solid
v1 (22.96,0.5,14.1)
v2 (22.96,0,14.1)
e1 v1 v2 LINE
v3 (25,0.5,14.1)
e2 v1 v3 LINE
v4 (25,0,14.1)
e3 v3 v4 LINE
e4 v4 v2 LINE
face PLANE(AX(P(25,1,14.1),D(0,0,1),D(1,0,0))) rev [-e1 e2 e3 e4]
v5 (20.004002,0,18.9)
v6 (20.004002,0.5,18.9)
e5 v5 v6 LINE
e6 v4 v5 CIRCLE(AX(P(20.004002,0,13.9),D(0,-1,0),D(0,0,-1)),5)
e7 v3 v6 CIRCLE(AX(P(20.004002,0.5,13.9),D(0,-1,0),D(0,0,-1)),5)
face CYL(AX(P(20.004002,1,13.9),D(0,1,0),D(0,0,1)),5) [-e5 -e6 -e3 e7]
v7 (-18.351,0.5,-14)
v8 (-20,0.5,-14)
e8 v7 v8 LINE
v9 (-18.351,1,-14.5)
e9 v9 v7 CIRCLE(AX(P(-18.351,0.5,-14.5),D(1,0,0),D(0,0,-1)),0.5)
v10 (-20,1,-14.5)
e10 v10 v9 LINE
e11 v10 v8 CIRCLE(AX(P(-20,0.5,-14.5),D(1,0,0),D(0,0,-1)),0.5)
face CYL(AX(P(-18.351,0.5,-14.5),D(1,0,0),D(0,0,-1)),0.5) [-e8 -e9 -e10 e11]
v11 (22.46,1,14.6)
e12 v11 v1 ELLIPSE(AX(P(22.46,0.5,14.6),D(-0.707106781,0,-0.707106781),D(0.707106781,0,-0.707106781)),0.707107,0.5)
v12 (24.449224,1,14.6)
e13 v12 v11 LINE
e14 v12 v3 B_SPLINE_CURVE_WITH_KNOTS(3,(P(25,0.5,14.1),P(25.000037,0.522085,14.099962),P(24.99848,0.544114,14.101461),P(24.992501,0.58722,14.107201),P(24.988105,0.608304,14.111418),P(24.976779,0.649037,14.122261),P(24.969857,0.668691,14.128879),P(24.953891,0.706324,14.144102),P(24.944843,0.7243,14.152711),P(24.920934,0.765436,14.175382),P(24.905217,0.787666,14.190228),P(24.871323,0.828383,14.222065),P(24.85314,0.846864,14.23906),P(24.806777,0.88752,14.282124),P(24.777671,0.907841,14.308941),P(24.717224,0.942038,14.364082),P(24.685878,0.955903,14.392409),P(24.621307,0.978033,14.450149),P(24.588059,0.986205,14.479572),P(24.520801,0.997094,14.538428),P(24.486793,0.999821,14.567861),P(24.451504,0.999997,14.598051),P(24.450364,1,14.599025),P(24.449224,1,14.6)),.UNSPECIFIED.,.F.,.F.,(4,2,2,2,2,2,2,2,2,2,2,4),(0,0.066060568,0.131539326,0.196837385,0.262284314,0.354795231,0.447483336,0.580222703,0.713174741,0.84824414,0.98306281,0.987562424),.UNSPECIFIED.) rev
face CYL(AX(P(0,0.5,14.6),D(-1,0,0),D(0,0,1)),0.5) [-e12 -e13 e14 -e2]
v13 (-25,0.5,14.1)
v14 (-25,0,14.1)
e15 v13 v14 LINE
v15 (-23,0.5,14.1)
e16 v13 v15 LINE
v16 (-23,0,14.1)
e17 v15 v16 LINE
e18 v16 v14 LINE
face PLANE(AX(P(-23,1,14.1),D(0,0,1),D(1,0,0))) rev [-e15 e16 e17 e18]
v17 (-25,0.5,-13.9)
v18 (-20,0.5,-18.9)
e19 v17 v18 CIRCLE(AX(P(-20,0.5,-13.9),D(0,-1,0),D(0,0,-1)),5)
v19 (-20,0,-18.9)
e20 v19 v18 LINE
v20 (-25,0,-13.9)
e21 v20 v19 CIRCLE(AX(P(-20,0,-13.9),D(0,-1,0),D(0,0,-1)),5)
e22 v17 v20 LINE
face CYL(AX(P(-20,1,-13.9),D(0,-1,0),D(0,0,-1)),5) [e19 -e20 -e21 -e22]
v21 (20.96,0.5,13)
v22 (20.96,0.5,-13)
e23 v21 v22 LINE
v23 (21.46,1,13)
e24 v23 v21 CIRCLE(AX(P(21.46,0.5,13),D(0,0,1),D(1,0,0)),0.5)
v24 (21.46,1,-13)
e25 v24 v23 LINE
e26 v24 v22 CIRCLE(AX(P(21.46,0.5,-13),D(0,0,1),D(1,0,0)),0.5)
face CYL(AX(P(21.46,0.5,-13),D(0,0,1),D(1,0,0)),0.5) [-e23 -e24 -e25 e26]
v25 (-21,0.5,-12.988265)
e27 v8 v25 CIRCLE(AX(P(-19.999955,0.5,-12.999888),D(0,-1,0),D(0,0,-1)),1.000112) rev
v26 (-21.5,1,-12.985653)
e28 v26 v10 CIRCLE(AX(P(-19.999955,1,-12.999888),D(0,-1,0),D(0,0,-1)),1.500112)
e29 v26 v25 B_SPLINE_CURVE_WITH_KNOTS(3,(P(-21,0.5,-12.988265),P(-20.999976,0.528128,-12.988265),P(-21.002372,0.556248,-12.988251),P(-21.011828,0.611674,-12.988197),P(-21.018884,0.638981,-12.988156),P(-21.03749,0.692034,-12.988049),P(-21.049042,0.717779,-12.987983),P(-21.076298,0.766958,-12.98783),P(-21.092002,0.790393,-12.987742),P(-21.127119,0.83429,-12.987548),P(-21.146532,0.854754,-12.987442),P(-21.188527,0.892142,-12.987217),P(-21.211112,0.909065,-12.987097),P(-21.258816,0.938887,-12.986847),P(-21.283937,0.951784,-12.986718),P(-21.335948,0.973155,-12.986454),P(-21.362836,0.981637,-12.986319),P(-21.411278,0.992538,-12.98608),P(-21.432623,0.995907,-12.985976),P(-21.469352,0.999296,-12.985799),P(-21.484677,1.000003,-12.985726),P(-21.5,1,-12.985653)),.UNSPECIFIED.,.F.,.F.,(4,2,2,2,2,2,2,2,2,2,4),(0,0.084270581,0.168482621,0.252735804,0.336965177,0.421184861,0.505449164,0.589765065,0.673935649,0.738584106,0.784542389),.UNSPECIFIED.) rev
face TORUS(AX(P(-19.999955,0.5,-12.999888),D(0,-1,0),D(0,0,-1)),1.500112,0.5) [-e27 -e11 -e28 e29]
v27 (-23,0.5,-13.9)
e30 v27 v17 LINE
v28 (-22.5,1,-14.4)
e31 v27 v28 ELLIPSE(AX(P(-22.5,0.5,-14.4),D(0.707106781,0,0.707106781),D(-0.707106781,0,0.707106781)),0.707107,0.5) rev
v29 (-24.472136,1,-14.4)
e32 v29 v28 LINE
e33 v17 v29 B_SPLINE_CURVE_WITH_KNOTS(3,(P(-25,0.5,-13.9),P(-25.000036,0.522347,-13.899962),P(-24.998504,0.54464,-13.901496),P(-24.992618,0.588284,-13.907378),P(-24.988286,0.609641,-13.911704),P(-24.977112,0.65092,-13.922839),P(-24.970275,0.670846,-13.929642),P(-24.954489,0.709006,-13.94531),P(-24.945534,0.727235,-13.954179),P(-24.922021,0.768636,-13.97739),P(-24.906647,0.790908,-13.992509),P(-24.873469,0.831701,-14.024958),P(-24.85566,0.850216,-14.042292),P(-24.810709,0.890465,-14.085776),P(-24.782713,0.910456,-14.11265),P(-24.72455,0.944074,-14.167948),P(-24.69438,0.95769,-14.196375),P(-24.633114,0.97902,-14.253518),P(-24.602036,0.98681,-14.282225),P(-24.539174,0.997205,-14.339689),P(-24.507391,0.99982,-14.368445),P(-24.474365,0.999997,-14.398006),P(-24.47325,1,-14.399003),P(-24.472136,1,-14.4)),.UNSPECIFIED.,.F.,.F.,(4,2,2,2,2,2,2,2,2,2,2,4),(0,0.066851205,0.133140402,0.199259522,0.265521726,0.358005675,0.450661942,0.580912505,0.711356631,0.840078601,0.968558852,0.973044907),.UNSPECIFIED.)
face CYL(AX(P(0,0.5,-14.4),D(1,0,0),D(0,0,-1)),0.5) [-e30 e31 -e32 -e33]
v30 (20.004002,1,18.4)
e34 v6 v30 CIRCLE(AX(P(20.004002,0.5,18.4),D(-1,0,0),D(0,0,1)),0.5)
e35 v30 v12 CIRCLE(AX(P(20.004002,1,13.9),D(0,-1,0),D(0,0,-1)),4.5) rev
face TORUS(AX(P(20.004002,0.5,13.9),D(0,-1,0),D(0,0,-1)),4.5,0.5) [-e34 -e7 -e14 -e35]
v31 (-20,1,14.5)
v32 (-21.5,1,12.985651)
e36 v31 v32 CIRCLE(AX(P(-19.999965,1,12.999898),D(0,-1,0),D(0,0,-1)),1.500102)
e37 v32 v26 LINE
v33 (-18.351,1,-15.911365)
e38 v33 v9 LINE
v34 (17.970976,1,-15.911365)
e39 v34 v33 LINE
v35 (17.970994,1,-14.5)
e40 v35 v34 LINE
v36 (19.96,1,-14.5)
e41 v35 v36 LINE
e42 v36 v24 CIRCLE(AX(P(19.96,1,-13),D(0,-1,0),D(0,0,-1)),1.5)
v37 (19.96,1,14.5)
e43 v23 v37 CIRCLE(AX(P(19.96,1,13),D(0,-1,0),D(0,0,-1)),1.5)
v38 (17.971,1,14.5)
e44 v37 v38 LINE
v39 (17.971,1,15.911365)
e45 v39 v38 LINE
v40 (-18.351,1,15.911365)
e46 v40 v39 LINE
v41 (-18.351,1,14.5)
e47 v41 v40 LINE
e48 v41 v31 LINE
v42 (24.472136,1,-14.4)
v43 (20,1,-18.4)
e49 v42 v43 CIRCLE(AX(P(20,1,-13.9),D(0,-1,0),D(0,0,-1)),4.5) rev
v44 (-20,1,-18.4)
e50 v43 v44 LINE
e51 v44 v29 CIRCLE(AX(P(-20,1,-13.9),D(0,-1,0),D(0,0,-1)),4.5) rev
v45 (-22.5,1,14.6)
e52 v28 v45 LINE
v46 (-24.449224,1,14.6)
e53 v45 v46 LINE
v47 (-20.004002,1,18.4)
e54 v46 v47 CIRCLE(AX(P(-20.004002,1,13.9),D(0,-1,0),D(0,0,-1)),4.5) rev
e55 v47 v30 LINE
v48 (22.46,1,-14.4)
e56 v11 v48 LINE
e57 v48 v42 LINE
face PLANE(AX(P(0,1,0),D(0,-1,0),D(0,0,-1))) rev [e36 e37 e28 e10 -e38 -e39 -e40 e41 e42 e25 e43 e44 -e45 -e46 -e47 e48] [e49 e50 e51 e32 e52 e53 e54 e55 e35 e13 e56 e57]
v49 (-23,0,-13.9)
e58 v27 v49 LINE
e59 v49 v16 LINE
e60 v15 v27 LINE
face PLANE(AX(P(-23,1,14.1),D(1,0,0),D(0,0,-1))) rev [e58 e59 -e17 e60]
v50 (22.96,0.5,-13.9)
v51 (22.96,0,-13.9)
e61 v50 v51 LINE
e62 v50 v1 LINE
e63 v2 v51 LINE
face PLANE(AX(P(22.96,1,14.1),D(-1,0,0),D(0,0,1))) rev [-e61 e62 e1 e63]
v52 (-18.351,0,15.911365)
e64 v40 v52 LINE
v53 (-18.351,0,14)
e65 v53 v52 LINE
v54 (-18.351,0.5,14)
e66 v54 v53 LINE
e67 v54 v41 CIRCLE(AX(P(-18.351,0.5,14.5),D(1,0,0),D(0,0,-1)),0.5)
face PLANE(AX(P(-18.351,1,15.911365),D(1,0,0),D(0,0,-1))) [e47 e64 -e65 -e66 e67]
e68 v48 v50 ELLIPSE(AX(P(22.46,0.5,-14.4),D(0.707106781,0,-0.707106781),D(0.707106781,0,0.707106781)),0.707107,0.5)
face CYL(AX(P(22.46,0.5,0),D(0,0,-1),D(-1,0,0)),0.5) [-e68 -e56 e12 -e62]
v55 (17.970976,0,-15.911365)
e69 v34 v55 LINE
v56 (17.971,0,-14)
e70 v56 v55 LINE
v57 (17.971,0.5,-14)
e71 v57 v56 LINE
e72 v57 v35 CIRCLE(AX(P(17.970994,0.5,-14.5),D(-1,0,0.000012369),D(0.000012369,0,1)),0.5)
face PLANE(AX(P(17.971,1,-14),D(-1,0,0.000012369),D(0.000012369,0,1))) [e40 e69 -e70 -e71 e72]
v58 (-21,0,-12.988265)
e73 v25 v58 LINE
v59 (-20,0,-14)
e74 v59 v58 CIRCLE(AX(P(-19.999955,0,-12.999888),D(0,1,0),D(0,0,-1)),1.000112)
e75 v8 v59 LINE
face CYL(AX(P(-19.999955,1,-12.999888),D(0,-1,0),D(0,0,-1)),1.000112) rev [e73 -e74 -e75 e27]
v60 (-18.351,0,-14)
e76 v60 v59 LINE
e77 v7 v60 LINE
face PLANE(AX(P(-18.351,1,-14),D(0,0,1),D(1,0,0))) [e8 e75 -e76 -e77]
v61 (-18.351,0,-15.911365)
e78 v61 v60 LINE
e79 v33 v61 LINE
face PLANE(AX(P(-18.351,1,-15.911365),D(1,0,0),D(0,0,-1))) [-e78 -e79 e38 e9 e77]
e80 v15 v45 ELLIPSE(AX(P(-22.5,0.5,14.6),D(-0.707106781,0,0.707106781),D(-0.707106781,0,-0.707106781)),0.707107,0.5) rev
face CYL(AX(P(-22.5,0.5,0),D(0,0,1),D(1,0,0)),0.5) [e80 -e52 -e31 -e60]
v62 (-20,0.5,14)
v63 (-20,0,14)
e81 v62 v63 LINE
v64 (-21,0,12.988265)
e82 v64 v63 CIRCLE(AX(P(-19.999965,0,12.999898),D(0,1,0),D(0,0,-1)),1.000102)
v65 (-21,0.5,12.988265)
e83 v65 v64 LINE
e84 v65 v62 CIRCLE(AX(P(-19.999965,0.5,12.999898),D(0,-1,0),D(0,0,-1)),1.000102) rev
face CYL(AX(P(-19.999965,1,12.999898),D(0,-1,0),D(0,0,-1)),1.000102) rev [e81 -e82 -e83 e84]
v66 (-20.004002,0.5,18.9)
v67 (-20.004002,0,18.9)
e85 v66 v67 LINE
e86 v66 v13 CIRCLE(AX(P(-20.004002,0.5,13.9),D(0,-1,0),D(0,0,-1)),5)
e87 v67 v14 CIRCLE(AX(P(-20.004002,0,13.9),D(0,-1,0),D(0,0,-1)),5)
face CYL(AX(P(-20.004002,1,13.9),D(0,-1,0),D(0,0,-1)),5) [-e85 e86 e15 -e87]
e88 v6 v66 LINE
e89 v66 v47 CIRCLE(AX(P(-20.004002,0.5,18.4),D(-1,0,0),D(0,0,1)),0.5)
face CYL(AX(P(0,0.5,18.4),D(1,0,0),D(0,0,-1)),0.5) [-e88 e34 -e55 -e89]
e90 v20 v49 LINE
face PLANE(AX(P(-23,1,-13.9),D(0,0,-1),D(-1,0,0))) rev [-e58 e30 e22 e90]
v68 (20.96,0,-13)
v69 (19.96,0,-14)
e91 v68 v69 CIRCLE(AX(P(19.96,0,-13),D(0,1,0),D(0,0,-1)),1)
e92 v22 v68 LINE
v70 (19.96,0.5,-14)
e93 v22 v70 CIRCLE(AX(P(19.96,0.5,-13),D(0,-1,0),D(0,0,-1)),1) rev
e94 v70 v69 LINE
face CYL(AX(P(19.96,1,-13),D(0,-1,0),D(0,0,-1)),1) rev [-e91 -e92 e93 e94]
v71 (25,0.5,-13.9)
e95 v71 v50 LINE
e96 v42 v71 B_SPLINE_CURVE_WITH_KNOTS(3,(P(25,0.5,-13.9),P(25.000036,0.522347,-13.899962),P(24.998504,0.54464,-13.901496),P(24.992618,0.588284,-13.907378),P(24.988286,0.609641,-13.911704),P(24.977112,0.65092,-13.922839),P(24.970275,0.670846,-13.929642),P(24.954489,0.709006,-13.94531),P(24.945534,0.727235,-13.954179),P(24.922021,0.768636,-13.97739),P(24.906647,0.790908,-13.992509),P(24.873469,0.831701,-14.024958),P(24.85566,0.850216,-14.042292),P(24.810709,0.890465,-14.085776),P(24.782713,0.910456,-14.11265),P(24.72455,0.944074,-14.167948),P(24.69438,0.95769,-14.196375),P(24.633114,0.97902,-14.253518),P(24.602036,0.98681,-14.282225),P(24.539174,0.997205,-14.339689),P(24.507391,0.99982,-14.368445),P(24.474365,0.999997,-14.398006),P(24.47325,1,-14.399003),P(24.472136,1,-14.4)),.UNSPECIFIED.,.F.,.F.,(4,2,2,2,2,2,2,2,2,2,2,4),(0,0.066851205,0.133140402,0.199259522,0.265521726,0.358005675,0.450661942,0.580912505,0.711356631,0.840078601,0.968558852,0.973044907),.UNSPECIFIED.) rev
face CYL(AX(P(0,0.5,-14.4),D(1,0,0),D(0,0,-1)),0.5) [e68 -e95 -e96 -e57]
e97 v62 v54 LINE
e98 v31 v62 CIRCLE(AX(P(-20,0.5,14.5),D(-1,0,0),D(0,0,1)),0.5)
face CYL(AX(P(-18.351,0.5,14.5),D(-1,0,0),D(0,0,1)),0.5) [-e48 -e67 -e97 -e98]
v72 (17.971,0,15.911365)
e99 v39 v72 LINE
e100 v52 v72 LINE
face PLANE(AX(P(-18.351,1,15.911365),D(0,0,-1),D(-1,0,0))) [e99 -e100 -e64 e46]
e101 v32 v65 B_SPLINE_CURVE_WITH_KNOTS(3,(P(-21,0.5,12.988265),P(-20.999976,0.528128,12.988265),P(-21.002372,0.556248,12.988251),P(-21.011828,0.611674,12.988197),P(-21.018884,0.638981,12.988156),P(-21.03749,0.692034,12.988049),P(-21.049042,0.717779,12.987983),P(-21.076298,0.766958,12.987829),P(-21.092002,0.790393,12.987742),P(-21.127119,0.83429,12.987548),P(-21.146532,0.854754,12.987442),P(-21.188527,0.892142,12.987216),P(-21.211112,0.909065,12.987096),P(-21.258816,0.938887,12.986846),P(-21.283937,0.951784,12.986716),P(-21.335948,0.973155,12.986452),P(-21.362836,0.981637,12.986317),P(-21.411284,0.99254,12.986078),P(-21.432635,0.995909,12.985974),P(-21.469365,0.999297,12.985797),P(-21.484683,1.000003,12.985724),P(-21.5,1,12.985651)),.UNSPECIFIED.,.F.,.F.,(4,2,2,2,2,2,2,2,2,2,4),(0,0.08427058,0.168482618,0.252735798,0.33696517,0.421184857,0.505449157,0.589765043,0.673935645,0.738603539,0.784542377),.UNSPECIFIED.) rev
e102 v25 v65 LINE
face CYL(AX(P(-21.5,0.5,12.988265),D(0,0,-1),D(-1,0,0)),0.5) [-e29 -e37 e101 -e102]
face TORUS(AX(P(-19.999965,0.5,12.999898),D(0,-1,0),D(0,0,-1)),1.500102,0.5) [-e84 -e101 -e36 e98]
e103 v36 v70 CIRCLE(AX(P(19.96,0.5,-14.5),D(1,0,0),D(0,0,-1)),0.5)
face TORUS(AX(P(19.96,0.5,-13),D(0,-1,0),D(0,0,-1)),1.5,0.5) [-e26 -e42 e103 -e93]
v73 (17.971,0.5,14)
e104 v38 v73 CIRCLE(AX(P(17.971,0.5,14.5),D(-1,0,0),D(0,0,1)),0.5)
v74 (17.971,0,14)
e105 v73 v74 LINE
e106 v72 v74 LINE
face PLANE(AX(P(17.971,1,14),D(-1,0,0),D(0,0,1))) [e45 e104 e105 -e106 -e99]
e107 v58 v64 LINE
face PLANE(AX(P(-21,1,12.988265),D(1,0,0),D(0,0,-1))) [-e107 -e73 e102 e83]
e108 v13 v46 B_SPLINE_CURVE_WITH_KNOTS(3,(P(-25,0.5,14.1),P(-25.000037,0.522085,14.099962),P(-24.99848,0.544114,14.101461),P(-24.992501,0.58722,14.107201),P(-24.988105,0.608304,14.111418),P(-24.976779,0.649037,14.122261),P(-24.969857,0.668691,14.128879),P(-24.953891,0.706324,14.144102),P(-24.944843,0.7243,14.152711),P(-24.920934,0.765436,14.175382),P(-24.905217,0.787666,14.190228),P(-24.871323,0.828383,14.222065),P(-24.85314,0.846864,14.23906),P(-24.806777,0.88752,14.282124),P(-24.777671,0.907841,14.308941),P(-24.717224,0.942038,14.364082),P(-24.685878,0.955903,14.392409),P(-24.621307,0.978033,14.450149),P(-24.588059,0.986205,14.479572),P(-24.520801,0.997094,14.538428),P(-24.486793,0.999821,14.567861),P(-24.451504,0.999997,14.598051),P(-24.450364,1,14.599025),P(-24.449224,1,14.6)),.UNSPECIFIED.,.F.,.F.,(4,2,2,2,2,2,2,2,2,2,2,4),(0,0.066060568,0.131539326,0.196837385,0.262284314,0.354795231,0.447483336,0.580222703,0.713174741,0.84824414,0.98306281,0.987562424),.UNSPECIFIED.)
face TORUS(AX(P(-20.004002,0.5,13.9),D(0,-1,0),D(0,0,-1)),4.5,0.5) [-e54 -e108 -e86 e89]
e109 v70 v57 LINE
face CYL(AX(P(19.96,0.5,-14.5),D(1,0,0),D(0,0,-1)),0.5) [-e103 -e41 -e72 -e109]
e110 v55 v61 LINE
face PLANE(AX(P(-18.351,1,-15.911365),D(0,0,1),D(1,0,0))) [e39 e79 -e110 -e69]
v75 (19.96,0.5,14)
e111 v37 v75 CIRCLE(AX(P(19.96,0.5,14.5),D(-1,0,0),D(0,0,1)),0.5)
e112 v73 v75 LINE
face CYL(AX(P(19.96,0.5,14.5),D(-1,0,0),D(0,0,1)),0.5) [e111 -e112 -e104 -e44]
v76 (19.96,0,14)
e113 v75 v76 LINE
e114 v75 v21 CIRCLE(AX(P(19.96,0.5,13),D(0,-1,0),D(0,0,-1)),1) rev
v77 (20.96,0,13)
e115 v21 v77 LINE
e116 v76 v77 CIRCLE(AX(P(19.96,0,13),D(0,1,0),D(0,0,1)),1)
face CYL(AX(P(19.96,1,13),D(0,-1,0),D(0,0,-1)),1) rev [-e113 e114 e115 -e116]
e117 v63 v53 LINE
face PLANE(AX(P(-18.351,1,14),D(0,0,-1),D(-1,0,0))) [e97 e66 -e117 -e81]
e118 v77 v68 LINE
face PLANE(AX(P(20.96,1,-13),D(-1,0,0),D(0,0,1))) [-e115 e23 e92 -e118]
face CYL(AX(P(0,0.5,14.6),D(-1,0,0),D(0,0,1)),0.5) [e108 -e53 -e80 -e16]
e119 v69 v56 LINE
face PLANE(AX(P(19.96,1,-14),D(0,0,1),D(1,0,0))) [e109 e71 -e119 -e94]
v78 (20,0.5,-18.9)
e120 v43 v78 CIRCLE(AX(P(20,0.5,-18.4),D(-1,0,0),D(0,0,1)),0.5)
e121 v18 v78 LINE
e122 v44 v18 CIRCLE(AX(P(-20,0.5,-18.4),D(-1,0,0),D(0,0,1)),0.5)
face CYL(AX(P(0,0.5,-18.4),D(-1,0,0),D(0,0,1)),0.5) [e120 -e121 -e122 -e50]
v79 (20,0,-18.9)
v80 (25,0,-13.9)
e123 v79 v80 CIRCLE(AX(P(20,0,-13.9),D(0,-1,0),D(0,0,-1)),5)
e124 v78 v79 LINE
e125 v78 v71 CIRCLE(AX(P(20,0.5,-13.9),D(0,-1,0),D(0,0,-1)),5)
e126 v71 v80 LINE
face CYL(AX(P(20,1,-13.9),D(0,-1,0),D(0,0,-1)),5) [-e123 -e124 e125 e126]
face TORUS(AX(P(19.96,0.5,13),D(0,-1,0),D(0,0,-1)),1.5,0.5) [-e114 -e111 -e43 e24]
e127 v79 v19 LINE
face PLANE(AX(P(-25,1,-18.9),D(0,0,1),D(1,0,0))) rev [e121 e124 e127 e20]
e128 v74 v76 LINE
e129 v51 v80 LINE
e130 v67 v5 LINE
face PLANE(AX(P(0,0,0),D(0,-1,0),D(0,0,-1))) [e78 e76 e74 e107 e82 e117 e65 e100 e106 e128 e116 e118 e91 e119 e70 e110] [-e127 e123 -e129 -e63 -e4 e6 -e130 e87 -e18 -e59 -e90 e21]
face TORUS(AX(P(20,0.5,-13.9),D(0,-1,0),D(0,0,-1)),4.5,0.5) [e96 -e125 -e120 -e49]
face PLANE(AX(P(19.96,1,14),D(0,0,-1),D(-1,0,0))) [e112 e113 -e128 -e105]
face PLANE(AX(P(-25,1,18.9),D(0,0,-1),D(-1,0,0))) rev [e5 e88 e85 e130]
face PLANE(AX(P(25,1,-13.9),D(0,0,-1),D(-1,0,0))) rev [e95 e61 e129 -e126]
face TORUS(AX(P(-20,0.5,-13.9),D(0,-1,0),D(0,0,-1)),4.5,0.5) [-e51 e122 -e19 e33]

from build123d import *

# Parameters (mm, degrees)
BOSS_EXTRUDE1_DEPTH = 1
FILLET1_R           = 5
FILLET2_R           = 0.5


with BuildPart() as part:
    # Sketch1 → Boss-Extrude1 (new body)
    with BuildSketch(Plane(origin=(0, 0, 0), x_dir=(1, 0, 0), z_dir=(0, 1, 0))):
        Polygon((-25, -18.9), (25, -18.9), (25, -14.1), (22.96, -14.1), (22.96, 13.9), (25, 13.9), (25, 18.9), (-25, 18.9), (-25, 13.9), (-23, 13.9), (-23, -14.1), (-25, -14.1), align=None)
        with BuildLine():
            Line((-18.351, 15.911365238), (17.970976359, 15.911365238))
            Line((17.970976359, 15.911365238), (17.971, 14))
            Line((17.971, 14), (19.96, 14))
            ThreePointArc((19.96, 14), (20.667106781, 13.707106781), (20.96, 13))
            Line((20.96, 13), (20.96, -13))
            ThreePointArc((20.96, -13), (20.667106781, -13.707106781), (19.96, -14))
            Line((19.96, -14), (17.971, -14))
            Line((17.971, -14), (17.971, -15.911365238))
            Line((17.971, -15.911365238), (-18.351, -15.911365238))
            Line((-18.351, -15.911365238), (-18.351, -14))
            Line((-18.351, -14), (-20, -14))
            ThreePointArc((-20, -14), (-20.711257423, -13.702939741), (-21, -12.988265238))
            Line((-21, -12.988265238), (-21, 12.988265238))
            ThreePointArc((-21, 12.988265238), (-20.711254501, 13.702936852), (-20, 14))
            Line((-20, 14), (-18.351, 14))
            Line((-18.351, 14), (-18.351, 15.911365238))
        make_face(mode=Mode.SUBTRACT)
    extrude(amount=BOSS_EXTRUDE1_DEPTH)

    # Fillet1
    # the kernel refuses this fillet: 5 mm, written as the material it takes off along each edge
    with BuildSketch(Plane(origin=(25, -12.489995997, 18.9), x_dir=(-1, 0, 0), z_dir=(0, 1, 0))) as fillet1_piece_1:
        with BuildLine():
            CenterArc((4.995998399, -5), FILLET1_R, 90, 87.707557224)
            Line((0, -4.8), (-0.099919968, -4.796))
            ThreePointArc((-0.099919968, -4.796), (-0.1, -2.4), (-0.1, 0))
            Line((-0.1, 0), (0, 0.1))
            Line((0, 0.1), (4.995998399, 0.1))
            Line((4.995998399, 0.1), (4.995998399, 0))
        make_face()
    extrude(amount=25.979991994, mode=Mode.SUBTRACT)
    with BuildSketch(Plane(origin=(-25, -12.489995997, 18.9), x_dir=(1, 0, 0), z_dir=(0, 1, 0))) as fillet1_piece_2:
        with BuildLine():
            CenterArc((4.995998399, 5), FILLET1_R, 182.292442776, 87.707557224)
            Line((0, 4.8), (-0.099919968, 4.796))
            ThreePointArc((-0.099919968, 4.796), (-0.1, 2.4), (-0.1, 0))
            Line((-0.1, 0), (0, -0.1))
            Line((0, -0.1), (4.995998399, -0.1))
            Line((4.995998399, -0.1), (4.995998399, 0))
        make_face()
    extrude(amount=25.979991994, mode=Mode.SUBTRACT)
    with BuildSketch(Plane(origin=(-25, -12.5, -18.9), x_dir=(1, 0, 0), z_dir=(0, 1, 0)), Plane(origin=(25, -12.5, -18.9), x_dir=(0, 0, 1), z_dir=(0, 1, 0))) as fillet1_piece_3:
        with BuildLine():
            CenterArc((FILLET1_R, -FILLET1_R), FILLET1_R, 90, 90)
            Line((0, -FILLET1_R), (-FILLET1_R * 0.02, -FILLET1_R))
            Line((-FILLET1_R * 0.02, -FILLET1_R), (-FILLET1_R * 0.02, FILLET1_R * 0.02))
            Line((-FILLET1_R * 0.02, FILLET1_R * 0.02), (FILLET1_R, FILLET1_R * 0.02))
            Line((FILLET1_R, FILLET1_R * 0.02), (FILLET1_R, 0))
        make_face()
    extrude(amount=26, mode=Mode.SUBTRACT)

    # Fillet2
    fillet2_edges = [part.edges().sort_by_distance(p)[0] for p in [
        (-24, 1, -13.9),
        (-23, 1, 0.1),
        (-24, 1, 14.1),
        (23.98, 1, 14.1),
        (22.96, 1, 0.1),
        (23.98, 1, -13.9),
        (-19.1755, 1, -14),
        (-20.711254501, 1, -13.702936852),
        (-21, 1, 0),
        (-20.711257423, 1, 13.702939741),
        (-19.1755, 1, 14),
        (18.9655, 1, 14),
        (20.667106781, 1, 13.707106781),
        (20.96, 1, 0),
        (20.667106781, 1, -13.707106781),
        (18.9655, 1, -14),
        (0, 1, -18.9),
        (0, 1, 18.9),
        (-23.468103216, 1, 17.505551275),
        (23.468103216, 1, 17.505551275),
        (23.535533906, 1, -17.435533906),
        (-23.535533906, 1, -17.435533906),
    ]]
    fillet(fillet2_edges, radius=FILLET2_R)


solid = part.part
